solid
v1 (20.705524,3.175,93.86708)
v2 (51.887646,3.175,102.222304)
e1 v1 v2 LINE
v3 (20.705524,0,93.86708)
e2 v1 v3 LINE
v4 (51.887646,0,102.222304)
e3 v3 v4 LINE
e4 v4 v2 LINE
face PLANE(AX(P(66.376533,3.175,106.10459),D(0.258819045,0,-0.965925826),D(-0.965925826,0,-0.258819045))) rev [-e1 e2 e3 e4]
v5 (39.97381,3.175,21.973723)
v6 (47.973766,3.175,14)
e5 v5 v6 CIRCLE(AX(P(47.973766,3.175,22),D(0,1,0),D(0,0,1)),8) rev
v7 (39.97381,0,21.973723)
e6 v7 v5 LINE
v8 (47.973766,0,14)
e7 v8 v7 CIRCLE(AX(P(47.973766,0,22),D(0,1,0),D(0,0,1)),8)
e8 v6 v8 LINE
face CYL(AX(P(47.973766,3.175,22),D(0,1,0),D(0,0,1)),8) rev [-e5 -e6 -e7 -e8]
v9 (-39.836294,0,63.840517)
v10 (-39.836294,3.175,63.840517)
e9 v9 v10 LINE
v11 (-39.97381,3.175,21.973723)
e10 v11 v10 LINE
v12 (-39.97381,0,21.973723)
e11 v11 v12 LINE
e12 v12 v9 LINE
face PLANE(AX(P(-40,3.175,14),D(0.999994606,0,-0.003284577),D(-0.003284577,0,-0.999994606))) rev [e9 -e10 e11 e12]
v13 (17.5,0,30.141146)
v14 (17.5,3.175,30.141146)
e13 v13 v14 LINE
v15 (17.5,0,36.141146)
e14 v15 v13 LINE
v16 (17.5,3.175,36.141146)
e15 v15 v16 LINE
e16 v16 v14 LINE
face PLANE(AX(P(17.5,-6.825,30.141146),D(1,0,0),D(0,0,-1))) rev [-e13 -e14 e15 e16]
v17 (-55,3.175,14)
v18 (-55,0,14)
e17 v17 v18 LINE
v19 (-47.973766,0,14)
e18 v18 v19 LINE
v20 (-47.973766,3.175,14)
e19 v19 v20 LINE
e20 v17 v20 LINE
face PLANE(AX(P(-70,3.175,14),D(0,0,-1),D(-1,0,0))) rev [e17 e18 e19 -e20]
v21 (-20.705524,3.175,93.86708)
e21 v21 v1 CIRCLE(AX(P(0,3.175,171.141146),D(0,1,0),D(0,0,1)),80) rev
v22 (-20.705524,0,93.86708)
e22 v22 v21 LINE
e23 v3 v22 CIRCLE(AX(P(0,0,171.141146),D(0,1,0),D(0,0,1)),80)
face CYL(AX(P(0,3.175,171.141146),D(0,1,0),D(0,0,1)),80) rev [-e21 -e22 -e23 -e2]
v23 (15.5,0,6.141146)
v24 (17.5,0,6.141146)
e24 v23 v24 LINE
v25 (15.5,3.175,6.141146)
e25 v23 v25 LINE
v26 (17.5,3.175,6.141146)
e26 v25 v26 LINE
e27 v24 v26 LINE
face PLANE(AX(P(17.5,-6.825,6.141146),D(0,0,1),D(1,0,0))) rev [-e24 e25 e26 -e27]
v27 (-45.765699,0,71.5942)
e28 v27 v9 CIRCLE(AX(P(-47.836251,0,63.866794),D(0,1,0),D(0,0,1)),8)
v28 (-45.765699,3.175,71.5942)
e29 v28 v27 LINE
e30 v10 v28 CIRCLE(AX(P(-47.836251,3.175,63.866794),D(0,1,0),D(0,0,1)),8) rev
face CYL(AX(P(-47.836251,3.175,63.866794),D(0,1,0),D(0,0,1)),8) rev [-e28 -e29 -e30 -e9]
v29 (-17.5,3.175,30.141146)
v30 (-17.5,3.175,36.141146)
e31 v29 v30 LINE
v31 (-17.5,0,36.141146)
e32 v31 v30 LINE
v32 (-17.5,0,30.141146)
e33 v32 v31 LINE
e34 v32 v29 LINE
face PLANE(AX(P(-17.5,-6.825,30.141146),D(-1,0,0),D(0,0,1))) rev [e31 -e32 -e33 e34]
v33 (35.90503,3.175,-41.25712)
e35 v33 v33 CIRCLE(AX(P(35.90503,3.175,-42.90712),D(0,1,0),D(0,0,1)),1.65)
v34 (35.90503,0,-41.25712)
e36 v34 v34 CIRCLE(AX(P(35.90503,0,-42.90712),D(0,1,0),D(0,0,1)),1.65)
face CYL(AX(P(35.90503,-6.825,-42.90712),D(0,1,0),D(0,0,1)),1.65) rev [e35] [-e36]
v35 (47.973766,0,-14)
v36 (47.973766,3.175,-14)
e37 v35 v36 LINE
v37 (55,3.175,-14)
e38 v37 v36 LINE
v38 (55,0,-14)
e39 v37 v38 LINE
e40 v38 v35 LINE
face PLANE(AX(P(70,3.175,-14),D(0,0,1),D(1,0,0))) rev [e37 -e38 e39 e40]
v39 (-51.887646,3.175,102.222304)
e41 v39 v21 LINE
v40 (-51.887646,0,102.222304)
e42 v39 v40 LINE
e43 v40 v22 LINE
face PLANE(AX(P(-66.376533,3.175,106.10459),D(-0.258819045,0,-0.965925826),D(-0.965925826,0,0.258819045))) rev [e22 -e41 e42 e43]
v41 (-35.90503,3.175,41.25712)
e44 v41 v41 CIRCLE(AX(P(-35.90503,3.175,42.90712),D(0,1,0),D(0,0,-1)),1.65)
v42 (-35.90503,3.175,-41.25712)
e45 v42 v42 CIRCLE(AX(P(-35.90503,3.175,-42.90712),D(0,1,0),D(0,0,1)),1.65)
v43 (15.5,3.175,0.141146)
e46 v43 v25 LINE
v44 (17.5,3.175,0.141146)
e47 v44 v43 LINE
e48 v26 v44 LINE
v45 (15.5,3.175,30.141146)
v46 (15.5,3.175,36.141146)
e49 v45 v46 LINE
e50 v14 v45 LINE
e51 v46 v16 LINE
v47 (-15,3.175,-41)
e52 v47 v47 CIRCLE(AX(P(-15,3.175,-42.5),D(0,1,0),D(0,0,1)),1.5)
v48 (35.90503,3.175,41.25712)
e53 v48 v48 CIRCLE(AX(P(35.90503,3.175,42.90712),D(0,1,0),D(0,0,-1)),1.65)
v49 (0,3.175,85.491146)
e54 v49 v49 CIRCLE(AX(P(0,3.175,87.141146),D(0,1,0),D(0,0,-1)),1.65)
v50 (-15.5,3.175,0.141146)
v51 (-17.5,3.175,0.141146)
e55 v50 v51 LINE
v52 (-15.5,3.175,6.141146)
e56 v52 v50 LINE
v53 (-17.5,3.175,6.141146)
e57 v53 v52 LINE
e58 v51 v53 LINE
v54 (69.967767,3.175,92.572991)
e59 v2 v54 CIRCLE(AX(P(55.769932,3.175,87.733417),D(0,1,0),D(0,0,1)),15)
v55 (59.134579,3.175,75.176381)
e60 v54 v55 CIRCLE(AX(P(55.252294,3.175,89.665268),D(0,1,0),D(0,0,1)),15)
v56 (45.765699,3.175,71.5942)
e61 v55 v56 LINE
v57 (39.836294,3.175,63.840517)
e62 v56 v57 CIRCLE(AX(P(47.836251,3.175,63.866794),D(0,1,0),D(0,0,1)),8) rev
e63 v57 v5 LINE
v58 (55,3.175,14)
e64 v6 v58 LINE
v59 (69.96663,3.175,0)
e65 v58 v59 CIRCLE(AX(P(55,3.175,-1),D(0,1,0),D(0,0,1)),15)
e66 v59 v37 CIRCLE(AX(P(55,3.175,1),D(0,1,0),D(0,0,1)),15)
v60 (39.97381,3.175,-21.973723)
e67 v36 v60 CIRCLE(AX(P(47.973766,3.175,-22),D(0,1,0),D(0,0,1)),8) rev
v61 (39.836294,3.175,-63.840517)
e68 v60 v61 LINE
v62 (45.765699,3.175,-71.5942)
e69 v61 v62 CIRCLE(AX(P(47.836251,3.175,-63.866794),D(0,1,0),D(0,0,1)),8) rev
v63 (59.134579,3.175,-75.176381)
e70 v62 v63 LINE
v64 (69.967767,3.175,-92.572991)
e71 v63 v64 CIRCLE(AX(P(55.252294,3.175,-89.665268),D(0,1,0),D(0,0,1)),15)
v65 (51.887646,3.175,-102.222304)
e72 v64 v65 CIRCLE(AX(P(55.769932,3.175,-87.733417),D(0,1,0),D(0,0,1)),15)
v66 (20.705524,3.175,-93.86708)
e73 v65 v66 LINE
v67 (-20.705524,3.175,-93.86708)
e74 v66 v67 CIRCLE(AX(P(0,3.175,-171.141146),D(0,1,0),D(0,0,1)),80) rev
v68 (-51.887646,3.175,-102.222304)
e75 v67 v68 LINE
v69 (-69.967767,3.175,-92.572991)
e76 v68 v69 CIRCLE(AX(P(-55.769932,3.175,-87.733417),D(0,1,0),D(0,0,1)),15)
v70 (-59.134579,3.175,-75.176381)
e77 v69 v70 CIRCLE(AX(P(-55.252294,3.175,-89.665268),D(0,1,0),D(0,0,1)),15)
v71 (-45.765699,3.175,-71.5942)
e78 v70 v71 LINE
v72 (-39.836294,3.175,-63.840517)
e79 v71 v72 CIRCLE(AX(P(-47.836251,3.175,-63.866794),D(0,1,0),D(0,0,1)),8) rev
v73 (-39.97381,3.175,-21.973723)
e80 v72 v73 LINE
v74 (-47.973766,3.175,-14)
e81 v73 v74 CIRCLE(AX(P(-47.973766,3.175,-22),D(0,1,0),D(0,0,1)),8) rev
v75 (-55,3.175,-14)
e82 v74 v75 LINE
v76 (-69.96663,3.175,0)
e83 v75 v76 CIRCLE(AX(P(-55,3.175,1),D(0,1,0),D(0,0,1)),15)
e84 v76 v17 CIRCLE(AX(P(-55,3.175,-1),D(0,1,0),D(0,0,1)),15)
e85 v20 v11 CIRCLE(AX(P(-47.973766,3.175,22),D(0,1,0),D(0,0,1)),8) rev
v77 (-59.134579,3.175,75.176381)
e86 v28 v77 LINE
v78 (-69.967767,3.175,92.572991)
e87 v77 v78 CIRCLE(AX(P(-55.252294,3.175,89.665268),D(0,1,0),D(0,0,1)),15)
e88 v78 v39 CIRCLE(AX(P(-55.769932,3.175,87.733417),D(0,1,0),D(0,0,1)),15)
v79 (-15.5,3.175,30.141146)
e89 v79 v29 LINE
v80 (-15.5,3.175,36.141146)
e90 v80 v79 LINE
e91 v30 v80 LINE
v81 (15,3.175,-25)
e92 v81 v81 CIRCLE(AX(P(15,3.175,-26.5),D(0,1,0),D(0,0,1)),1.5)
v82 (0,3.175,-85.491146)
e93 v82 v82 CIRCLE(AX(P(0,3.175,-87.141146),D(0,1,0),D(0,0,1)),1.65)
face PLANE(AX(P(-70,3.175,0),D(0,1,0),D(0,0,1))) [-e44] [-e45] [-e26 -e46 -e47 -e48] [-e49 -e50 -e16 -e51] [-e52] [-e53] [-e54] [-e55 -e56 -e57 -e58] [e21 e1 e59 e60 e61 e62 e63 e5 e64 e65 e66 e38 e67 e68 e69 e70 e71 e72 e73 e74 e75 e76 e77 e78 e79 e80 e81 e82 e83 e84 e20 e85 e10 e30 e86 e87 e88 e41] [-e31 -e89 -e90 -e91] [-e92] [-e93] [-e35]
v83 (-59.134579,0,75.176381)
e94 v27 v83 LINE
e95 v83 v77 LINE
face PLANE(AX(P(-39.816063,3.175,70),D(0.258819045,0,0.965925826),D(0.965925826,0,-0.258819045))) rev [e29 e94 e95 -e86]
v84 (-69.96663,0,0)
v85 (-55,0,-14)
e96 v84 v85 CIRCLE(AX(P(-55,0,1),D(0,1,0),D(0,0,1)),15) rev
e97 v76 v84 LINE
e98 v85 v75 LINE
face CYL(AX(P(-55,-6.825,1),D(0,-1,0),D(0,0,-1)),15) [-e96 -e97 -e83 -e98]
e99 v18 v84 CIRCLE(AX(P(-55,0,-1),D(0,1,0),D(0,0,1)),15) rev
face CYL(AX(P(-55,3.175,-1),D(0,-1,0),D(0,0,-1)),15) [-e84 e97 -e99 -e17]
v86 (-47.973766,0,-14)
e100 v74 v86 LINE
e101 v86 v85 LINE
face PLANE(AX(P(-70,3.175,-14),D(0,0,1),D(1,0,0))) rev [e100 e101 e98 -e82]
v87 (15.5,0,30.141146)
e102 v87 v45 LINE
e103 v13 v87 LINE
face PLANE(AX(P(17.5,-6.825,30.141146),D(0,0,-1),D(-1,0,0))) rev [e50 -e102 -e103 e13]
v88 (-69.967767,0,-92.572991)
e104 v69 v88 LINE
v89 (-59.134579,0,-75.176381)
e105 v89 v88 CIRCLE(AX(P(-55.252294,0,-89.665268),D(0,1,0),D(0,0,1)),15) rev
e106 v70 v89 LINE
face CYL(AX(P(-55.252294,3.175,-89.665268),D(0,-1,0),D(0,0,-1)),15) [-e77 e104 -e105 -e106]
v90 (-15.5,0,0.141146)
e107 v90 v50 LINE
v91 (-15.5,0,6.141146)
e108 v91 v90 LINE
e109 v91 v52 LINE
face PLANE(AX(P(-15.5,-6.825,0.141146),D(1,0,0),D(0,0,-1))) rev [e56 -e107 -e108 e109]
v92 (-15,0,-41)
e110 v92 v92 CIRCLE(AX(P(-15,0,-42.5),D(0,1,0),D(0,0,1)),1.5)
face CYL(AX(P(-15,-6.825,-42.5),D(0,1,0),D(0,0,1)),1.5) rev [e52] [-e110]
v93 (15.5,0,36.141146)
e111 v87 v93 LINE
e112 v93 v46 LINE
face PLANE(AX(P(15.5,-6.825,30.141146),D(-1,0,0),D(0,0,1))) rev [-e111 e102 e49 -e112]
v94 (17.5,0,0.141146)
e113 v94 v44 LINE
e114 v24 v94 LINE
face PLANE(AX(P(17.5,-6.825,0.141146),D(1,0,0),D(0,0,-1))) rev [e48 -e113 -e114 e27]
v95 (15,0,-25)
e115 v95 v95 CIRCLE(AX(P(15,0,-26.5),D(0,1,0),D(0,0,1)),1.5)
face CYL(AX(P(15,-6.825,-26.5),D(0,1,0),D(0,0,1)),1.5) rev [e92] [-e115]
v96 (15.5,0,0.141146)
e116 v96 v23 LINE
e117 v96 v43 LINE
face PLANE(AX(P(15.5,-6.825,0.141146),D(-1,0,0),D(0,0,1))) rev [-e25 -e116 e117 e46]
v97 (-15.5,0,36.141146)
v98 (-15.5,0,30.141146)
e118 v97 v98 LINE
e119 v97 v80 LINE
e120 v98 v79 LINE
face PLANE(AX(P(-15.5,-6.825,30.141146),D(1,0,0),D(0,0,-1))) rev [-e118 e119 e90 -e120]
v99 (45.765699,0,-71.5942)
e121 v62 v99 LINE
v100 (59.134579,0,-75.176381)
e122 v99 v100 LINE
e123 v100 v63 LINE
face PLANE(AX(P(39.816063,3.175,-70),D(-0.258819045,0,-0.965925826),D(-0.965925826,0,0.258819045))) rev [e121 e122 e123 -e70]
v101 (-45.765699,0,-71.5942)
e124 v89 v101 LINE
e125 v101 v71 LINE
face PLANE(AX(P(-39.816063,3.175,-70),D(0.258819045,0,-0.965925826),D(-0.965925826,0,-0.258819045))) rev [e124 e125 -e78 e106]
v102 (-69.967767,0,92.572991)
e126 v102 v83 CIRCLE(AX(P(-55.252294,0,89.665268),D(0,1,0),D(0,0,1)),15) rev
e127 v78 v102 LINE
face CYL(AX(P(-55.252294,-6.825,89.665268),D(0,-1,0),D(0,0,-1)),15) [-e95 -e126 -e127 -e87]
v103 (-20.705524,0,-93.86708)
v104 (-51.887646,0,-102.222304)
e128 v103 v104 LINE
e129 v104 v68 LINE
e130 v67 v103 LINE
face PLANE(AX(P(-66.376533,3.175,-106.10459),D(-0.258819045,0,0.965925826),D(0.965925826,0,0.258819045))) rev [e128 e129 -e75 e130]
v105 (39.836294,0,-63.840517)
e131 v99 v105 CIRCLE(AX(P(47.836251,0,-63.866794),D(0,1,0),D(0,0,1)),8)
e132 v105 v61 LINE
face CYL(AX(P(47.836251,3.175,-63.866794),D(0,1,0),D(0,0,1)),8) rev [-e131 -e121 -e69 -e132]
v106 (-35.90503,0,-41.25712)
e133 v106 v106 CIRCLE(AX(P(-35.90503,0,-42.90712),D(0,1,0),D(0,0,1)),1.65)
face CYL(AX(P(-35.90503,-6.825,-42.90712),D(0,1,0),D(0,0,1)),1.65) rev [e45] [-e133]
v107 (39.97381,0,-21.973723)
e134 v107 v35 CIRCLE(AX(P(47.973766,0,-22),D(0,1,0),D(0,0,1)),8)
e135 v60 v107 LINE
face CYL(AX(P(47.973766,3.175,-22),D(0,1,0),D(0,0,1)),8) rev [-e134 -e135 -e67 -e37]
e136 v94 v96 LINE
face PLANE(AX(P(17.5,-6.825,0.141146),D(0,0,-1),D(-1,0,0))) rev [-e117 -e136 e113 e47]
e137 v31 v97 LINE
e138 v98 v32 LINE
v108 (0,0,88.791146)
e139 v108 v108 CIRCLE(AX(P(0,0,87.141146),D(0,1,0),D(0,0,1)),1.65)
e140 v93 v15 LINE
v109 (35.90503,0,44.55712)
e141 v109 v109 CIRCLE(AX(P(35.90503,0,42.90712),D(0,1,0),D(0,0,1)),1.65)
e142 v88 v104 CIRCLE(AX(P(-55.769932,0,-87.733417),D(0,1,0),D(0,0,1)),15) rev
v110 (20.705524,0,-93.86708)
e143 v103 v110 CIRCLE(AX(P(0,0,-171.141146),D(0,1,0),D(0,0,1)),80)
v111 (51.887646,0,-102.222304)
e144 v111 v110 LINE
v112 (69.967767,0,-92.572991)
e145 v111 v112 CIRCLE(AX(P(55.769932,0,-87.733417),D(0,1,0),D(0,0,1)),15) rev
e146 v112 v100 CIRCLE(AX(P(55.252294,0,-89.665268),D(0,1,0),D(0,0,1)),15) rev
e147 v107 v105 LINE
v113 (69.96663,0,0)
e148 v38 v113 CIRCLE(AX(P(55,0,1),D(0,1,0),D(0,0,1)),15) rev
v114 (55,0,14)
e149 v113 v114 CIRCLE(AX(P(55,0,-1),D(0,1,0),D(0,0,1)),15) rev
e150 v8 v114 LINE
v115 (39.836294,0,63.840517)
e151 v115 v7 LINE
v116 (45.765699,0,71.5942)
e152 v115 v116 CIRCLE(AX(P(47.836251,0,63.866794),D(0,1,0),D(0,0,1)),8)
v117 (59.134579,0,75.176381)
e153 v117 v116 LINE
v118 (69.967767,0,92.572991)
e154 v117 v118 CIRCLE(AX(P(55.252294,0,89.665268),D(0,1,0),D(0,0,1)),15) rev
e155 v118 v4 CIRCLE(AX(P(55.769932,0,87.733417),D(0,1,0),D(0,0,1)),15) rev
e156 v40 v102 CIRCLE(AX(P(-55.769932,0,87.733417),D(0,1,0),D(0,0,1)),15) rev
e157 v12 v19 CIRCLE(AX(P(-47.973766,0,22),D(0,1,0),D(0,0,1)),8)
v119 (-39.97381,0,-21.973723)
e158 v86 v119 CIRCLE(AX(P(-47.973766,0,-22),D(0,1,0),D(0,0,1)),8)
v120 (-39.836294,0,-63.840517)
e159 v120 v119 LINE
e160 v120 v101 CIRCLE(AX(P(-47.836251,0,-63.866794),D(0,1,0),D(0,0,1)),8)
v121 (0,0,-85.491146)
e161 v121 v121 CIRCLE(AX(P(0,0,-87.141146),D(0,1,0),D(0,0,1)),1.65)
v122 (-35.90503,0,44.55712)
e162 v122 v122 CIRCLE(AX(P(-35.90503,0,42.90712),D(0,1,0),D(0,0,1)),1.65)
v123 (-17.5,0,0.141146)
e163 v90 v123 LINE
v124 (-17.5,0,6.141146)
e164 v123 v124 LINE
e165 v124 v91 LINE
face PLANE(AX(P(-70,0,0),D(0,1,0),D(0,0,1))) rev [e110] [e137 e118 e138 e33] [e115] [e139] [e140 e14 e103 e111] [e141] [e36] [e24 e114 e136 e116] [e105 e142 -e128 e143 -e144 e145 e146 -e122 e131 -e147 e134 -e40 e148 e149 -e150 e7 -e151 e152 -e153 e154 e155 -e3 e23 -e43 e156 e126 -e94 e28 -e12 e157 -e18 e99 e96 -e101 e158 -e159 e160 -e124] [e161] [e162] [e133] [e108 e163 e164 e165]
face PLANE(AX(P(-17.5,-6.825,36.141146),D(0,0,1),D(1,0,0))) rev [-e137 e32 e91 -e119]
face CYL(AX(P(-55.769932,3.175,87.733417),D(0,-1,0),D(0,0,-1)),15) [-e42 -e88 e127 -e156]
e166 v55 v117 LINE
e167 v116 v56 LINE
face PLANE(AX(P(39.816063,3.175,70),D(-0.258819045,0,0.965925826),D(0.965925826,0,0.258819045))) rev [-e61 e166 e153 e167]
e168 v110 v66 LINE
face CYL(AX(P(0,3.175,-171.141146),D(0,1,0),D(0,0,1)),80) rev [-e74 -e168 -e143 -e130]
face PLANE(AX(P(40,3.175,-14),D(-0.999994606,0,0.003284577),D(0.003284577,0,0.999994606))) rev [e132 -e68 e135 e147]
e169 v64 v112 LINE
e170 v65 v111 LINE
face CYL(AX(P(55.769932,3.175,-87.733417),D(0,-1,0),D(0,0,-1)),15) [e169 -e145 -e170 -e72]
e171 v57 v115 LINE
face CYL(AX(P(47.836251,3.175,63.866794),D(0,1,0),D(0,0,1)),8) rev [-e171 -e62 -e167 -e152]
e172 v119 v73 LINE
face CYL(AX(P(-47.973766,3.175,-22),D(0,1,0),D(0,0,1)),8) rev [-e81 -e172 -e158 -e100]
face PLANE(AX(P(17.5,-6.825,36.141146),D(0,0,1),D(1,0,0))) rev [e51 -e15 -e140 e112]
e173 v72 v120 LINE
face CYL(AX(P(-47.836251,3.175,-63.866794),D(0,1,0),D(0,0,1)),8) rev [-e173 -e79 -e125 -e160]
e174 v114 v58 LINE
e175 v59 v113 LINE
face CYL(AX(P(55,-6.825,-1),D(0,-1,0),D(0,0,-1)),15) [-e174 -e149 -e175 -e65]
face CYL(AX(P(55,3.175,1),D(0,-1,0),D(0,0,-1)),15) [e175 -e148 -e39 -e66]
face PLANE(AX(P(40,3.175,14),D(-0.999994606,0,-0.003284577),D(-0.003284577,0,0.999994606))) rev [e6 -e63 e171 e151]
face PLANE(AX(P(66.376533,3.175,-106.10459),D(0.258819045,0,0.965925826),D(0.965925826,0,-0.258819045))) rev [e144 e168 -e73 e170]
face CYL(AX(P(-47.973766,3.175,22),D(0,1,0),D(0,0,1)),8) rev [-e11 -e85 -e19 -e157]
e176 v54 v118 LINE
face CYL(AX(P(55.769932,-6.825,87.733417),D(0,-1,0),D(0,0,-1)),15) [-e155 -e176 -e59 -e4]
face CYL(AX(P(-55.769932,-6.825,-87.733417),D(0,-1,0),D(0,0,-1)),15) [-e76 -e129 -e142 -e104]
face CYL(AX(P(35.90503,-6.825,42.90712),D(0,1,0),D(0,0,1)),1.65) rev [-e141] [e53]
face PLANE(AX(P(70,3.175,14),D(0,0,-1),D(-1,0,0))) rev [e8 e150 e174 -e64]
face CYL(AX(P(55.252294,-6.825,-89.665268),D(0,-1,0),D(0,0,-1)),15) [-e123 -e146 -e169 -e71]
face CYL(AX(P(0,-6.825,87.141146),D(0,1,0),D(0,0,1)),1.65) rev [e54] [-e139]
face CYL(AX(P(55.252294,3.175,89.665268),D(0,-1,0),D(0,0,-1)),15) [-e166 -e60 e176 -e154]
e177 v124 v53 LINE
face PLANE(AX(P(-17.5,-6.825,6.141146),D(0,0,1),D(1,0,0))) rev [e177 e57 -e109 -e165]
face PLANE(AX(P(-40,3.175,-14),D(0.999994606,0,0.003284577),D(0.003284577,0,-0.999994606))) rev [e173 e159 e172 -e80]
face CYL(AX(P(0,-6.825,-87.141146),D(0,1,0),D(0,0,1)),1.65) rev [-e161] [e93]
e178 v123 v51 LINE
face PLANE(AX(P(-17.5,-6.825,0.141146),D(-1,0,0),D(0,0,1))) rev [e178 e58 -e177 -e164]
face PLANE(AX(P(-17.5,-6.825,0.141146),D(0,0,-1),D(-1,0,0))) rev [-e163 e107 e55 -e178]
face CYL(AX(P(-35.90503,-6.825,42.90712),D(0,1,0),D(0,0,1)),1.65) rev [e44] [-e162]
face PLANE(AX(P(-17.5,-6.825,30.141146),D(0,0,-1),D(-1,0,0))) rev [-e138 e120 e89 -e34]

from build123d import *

# Parameters (mm, degrees)
BOSS_EXTRUDE1_DEPTH = 3.175
FILLET1_R           = 80
FILLET2_R           = 8
SKETCH2_R           = 1.65
CUT_EXTRUDE1_DEPTH  = 10
CUT_EXTRUDE2_DEPTH  = 10
SKETCH4_W           = 2
SKETCH4_H           = 6
CUT_EXTRUDE3_DEPTH  = 10
CUT_EXTRUDE4_START  = -10
CUT_EXTRUDE4_DEPTH  = 10
FILLET3_R           = 15


with BuildPart() as part:
    # Sketch1 → Boss-Extrude1 (new body)
    with BuildSketch(Plane(origin=(0, 0, 0), x_dir=(1, 0, 0), z_dir=(0, 1, 0))):
        with BuildLine():
            Line((-70, 14), (-40, 14))
            Line((-40, 14), (-39.816062711, 70))
            Line((-39.816062711, 70), (-73.623466631, 79.058666579))
            ThreePointArc((-73.623466631, 79.058666579), (-83.522961568, 96.205094778), (-66.376533369, 106.104589715))
            Line((-66.376533369, 106.104589715), (0, 88.319051202))
            Line((0, 88.319051202), (66.376533369, 106.104589715))
            ThreePointArc((66.376533369, 106.104589715), (83.522961568, 96.205094778), (73.623466631, 79.058666579))
            Line((73.623466631, 79.058666579), (39.816062711, 70))
            Line((39.816062711, 70), (40, 14))
            Line((40, 14), (70, 14))
            ThreePointArc((70, 14), (84, 0), (70, -14))
            Line((70, -14), (40, -14))
            Line((40, -14), (39.816062711, -70))
            Line((39.816062711, -70), (73.623466631, -79.058666579))
            ThreePointArc((73.623466631, -79.058666579), (83.522961568, -96.205094778), (66.376533369, -106.104589715))
            Line((66.376533369, -106.104589715), (0, -88.319051202))
            Line((0, -88.319051202), (-66.376533369, -106.104589715))
            ThreePointArc((-66.376533369, -106.104589715), (-83.522961568, -96.205094778), (-73.623466631, -79.058666579))
            Line((-73.623466631, -79.058666579), (-39.816062711, -70))
            Line((-39.816062711, -70), (-40, -14))
            Line((-40, -14), (-70, -14))
            ThreePointArc((-70, -14), (-84, 0), (-70, 14))
        make_face()
    extrude(amount=BOSS_EXTRUDE1_DEPTH)

    # Fillet1
    fillet1_edges = [part.edges().sort_by_distance(p)[0] for p in [
        (0, 1.5875, -88.319051202),
        (0, 1.5875, 88.319051202),
    ]]
    fillet(fillet1_edges, radius=FILLET1_R)

    # Fillet2
    fillet2_edges = [part.edges().sort_by_distance(p)[0] for p in [
        (-40, 1.5875, -14),
        (-39.816062711, 1.5875, -70),
        (39.816062711, 1.5875, -70),
        (40, 1.5875, -14),
        (40, 1.5875, 14),
        (39.816062711, 1.5875, 70),
        (-39.816062711, 1.5875, 70),
        (-40, 1.5875, 14),
    ]]
    fillet(fillet2_edges, radius=FILLET2_R)

    # Sketch2 → Cut-Extrude1 (cut)
    with BuildSketch(Plane(origin=(0, 3.175, 0), x_dir=(1, 0, 0), z_dir=(0, 1, 0))):
        with Locations(Location((0, 87.141145635, 0), (0, 0, 270))):
            Circle(SKETCH2_R)
        with Locations(Location((-35.905030257, 42.907120147, 0), (0, 0, 270))):
            Circle(SKETCH2_R)
        with Locations(Location((35.905030257, 42.907120147, 0), (0, 0, 270))):
            Circle(SKETCH2_R)
        with Locations(Location((35.905030257, -42.907120147, 0), (0, 0, 270))):
            Circle(SKETCH2_R)
        with Locations(Location((0, -87.141145635, 0), (0, 0, 270))):
            Circle(SKETCH2_R)
        with Locations(Location((-35.905030257, -42.907120147, 0), (0, 0, 270))):
            Circle(SKETCH2_R)
    extrude(amount=-CUT_EXTRUDE1_DEPTH, mode=Mode.SUBTRACT)

    # Sketch3 → Cut-Extrude2 (cut)
    with BuildSketch(Plane(origin=(0, 3.175, 0), x_dir=(1, 0, 0), z_dir=(0, 1, 0))):
        with BuildLine():
            ThreePointArc((13.5, 26.5), (15, 25), (16.5, 26.5))
            ThreePointArc((16.5, 26.5), (15, 28), (13.5, 26.5))
        make_face()
        with BuildLine():
            ThreePointArc((-16.5, 42.5), (-15, 41), (-13.5, 42.5))
            ThreePointArc((-13.5, 42.5), (-15, 44), (-16.5, 42.5))
        make_face()
    extrude(amount=-CUT_EXTRUDE2_DEPTH, mode=Mode.SUBTRACT)

    # Sketch4 → Cut-Extrude3 (cut)
    with BuildSketch(Plane(origin=(0, 3.175, 0), x_dir=(1, 0, 0), z_dir=(0, 1, 0))):
        with Locations((-16.5, -33.141145635)):
            Rectangle(SKETCH4_W, SKETCH4_H)
        with Locations((16.5, -3.141145635)):
            Rectangle(SKETCH4_W, SKETCH4_H)
        with Locations((16.5, -33.141145635)):
            Rectangle(SKETCH4_W, SKETCH4_H)
        with Locations((-16.5, -3.141145635)):
            Rectangle(SKETCH4_W, SKETCH4_H)
    extrude(amount=-CUT_EXTRUDE3_DEPTH, mode=Mode.SUBTRACT)

    # Sketch5 → Cut-Extrude4 (cut)
    with BuildSketch(Plane(origin=(0, 3.175, 0), x_dir=(1, 0, 0), z_dir=(0, 1, 0)).offset(CUT_EXTRUDE4_START)):
        with BuildLine():
            Line((-73.623466631, 79.058666579), (-66.376533369, 106.104589715))
            ThreePointArc((-66.376533369, 106.104589715), (-83.522961568, 96.205094778), (-73.623466631, 79.058666579))
        make_face()
        with BuildLine():
            Line((73.623466631, 79.058666579), (66.376533369, 106.104589715))
            ThreePointArc((66.376533369, 106.104589715), (83.522961568, 96.205094778), (73.623466631, 79.058666579))
        make_face()
        with BuildLine():
            Line((73.623466631, -79.058666579), (66.376533369, -106.104589715))
            ThreePointArc((66.376533369, -106.104589715), (83.522961568, -96.205094778), (73.623466631, -79.058666579))
        make_face()
        with BuildLine():
            Line((-73.623466631, -79.058666579), (-66.376533369, -106.104589715))
            ThreePointArc((-66.376533369, -106.104589715), (-83.522961568, -96.205094778), (-73.623466631, -79.058666579))
        make_face()
        with BuildLine():
            Line((-70, 14), (-70, -14))
            ThreePointArc((-70, -14), (-84, 0), (-70, 14))
        make_face()
        with BuildLine():
            Line((70, 14), (70, -14))
            ThreePointArc((70, -14), (84, 0), (70, 14))
        make_face()
    extrude(amount=CUT_EXTRUDE4_DEPTH, mode=Mode.SUBTRACT)

    # Fillet3
    # the kernel refuses this fillet: 15 mm, written as the material it takes off along each edge
    with BuildSketch(Plane(origin=(66.376533369, -37.5, -106.104589715), x_dir=(0.25881904510251735, 0, 0.9659258262890692), z_dir=(0, 1, 0)), Plane(origin=(73.623466631, -37.5, -79.058666579), x_dir=(-0.9659258262890694, 0, 0.2588190451025162), z_dir=(0, 1, 0)), Plane(origin=(70, -37.5, -14), x_dir=(0, 0, 1), z_dir=(0, 1, 0)), Plane(origin=(70, -37.5, 14), x_dir=(-1, 0, 0), z_dir=(0, 1, 0)), Plane(origin=(73.623466631, -37.5, 79.058666579), x_dir=(-0.2588190451025152, 0, 0.9659258262890699), z_dir=(0, 1, 0)), Plane(origin=(66.376533369, -37.5, 106.104589715), x_dir=(-0.9659258262890692, 0, -0.2588190451025171), z_dir=(0, 1, 0)), Plane(origin=(-66.376533369, -37.5, 106.104589715), x_dir=(-0.25881904510251846, 0, -0.965925826289069), z_dir=(0, 1, 0)), Plane(origin=(-73.623466631, -37.5, 79.058666579), x_dir=(0.9659258262890696, 0, -0.25881904510251585), z_dir=(0, 1, 0)), Plane(origin=(-70, -37.5, 14), x_dir=(0, 0, -1), z_dir=(0, 1, 0)), Plane(origin=(-70, -37.5, -14), x_dir=(1, 0, 0), z_dir=(0, 1, 0)), Plane(origin=(-73.623466631, -37.5, -79.058666579), x_dir=(0.2588190451025171, 0, -0.9659258262890692), z_dir=(0, 1, 0)), Plane(origin=(-66.376533369, -37.5, -106.104589715), x_dir=(0.9659258262890688, 0, 0.2588190451025186), z_dir=(0, 1, 0))) as fillet3_piece_1:
        with BuildLine():
            CenterArc((FILLET3_R, -FILLET3_R), FILLET3_R, 90, 90)
            Line((0, -FILLET3_R), (0, 0))
            Line((0, 0), (FILLET3_R, 0))
        make_face()
    extrude(amount=78.175, mode=Mode.SUBTRACT)


solid = part.part
